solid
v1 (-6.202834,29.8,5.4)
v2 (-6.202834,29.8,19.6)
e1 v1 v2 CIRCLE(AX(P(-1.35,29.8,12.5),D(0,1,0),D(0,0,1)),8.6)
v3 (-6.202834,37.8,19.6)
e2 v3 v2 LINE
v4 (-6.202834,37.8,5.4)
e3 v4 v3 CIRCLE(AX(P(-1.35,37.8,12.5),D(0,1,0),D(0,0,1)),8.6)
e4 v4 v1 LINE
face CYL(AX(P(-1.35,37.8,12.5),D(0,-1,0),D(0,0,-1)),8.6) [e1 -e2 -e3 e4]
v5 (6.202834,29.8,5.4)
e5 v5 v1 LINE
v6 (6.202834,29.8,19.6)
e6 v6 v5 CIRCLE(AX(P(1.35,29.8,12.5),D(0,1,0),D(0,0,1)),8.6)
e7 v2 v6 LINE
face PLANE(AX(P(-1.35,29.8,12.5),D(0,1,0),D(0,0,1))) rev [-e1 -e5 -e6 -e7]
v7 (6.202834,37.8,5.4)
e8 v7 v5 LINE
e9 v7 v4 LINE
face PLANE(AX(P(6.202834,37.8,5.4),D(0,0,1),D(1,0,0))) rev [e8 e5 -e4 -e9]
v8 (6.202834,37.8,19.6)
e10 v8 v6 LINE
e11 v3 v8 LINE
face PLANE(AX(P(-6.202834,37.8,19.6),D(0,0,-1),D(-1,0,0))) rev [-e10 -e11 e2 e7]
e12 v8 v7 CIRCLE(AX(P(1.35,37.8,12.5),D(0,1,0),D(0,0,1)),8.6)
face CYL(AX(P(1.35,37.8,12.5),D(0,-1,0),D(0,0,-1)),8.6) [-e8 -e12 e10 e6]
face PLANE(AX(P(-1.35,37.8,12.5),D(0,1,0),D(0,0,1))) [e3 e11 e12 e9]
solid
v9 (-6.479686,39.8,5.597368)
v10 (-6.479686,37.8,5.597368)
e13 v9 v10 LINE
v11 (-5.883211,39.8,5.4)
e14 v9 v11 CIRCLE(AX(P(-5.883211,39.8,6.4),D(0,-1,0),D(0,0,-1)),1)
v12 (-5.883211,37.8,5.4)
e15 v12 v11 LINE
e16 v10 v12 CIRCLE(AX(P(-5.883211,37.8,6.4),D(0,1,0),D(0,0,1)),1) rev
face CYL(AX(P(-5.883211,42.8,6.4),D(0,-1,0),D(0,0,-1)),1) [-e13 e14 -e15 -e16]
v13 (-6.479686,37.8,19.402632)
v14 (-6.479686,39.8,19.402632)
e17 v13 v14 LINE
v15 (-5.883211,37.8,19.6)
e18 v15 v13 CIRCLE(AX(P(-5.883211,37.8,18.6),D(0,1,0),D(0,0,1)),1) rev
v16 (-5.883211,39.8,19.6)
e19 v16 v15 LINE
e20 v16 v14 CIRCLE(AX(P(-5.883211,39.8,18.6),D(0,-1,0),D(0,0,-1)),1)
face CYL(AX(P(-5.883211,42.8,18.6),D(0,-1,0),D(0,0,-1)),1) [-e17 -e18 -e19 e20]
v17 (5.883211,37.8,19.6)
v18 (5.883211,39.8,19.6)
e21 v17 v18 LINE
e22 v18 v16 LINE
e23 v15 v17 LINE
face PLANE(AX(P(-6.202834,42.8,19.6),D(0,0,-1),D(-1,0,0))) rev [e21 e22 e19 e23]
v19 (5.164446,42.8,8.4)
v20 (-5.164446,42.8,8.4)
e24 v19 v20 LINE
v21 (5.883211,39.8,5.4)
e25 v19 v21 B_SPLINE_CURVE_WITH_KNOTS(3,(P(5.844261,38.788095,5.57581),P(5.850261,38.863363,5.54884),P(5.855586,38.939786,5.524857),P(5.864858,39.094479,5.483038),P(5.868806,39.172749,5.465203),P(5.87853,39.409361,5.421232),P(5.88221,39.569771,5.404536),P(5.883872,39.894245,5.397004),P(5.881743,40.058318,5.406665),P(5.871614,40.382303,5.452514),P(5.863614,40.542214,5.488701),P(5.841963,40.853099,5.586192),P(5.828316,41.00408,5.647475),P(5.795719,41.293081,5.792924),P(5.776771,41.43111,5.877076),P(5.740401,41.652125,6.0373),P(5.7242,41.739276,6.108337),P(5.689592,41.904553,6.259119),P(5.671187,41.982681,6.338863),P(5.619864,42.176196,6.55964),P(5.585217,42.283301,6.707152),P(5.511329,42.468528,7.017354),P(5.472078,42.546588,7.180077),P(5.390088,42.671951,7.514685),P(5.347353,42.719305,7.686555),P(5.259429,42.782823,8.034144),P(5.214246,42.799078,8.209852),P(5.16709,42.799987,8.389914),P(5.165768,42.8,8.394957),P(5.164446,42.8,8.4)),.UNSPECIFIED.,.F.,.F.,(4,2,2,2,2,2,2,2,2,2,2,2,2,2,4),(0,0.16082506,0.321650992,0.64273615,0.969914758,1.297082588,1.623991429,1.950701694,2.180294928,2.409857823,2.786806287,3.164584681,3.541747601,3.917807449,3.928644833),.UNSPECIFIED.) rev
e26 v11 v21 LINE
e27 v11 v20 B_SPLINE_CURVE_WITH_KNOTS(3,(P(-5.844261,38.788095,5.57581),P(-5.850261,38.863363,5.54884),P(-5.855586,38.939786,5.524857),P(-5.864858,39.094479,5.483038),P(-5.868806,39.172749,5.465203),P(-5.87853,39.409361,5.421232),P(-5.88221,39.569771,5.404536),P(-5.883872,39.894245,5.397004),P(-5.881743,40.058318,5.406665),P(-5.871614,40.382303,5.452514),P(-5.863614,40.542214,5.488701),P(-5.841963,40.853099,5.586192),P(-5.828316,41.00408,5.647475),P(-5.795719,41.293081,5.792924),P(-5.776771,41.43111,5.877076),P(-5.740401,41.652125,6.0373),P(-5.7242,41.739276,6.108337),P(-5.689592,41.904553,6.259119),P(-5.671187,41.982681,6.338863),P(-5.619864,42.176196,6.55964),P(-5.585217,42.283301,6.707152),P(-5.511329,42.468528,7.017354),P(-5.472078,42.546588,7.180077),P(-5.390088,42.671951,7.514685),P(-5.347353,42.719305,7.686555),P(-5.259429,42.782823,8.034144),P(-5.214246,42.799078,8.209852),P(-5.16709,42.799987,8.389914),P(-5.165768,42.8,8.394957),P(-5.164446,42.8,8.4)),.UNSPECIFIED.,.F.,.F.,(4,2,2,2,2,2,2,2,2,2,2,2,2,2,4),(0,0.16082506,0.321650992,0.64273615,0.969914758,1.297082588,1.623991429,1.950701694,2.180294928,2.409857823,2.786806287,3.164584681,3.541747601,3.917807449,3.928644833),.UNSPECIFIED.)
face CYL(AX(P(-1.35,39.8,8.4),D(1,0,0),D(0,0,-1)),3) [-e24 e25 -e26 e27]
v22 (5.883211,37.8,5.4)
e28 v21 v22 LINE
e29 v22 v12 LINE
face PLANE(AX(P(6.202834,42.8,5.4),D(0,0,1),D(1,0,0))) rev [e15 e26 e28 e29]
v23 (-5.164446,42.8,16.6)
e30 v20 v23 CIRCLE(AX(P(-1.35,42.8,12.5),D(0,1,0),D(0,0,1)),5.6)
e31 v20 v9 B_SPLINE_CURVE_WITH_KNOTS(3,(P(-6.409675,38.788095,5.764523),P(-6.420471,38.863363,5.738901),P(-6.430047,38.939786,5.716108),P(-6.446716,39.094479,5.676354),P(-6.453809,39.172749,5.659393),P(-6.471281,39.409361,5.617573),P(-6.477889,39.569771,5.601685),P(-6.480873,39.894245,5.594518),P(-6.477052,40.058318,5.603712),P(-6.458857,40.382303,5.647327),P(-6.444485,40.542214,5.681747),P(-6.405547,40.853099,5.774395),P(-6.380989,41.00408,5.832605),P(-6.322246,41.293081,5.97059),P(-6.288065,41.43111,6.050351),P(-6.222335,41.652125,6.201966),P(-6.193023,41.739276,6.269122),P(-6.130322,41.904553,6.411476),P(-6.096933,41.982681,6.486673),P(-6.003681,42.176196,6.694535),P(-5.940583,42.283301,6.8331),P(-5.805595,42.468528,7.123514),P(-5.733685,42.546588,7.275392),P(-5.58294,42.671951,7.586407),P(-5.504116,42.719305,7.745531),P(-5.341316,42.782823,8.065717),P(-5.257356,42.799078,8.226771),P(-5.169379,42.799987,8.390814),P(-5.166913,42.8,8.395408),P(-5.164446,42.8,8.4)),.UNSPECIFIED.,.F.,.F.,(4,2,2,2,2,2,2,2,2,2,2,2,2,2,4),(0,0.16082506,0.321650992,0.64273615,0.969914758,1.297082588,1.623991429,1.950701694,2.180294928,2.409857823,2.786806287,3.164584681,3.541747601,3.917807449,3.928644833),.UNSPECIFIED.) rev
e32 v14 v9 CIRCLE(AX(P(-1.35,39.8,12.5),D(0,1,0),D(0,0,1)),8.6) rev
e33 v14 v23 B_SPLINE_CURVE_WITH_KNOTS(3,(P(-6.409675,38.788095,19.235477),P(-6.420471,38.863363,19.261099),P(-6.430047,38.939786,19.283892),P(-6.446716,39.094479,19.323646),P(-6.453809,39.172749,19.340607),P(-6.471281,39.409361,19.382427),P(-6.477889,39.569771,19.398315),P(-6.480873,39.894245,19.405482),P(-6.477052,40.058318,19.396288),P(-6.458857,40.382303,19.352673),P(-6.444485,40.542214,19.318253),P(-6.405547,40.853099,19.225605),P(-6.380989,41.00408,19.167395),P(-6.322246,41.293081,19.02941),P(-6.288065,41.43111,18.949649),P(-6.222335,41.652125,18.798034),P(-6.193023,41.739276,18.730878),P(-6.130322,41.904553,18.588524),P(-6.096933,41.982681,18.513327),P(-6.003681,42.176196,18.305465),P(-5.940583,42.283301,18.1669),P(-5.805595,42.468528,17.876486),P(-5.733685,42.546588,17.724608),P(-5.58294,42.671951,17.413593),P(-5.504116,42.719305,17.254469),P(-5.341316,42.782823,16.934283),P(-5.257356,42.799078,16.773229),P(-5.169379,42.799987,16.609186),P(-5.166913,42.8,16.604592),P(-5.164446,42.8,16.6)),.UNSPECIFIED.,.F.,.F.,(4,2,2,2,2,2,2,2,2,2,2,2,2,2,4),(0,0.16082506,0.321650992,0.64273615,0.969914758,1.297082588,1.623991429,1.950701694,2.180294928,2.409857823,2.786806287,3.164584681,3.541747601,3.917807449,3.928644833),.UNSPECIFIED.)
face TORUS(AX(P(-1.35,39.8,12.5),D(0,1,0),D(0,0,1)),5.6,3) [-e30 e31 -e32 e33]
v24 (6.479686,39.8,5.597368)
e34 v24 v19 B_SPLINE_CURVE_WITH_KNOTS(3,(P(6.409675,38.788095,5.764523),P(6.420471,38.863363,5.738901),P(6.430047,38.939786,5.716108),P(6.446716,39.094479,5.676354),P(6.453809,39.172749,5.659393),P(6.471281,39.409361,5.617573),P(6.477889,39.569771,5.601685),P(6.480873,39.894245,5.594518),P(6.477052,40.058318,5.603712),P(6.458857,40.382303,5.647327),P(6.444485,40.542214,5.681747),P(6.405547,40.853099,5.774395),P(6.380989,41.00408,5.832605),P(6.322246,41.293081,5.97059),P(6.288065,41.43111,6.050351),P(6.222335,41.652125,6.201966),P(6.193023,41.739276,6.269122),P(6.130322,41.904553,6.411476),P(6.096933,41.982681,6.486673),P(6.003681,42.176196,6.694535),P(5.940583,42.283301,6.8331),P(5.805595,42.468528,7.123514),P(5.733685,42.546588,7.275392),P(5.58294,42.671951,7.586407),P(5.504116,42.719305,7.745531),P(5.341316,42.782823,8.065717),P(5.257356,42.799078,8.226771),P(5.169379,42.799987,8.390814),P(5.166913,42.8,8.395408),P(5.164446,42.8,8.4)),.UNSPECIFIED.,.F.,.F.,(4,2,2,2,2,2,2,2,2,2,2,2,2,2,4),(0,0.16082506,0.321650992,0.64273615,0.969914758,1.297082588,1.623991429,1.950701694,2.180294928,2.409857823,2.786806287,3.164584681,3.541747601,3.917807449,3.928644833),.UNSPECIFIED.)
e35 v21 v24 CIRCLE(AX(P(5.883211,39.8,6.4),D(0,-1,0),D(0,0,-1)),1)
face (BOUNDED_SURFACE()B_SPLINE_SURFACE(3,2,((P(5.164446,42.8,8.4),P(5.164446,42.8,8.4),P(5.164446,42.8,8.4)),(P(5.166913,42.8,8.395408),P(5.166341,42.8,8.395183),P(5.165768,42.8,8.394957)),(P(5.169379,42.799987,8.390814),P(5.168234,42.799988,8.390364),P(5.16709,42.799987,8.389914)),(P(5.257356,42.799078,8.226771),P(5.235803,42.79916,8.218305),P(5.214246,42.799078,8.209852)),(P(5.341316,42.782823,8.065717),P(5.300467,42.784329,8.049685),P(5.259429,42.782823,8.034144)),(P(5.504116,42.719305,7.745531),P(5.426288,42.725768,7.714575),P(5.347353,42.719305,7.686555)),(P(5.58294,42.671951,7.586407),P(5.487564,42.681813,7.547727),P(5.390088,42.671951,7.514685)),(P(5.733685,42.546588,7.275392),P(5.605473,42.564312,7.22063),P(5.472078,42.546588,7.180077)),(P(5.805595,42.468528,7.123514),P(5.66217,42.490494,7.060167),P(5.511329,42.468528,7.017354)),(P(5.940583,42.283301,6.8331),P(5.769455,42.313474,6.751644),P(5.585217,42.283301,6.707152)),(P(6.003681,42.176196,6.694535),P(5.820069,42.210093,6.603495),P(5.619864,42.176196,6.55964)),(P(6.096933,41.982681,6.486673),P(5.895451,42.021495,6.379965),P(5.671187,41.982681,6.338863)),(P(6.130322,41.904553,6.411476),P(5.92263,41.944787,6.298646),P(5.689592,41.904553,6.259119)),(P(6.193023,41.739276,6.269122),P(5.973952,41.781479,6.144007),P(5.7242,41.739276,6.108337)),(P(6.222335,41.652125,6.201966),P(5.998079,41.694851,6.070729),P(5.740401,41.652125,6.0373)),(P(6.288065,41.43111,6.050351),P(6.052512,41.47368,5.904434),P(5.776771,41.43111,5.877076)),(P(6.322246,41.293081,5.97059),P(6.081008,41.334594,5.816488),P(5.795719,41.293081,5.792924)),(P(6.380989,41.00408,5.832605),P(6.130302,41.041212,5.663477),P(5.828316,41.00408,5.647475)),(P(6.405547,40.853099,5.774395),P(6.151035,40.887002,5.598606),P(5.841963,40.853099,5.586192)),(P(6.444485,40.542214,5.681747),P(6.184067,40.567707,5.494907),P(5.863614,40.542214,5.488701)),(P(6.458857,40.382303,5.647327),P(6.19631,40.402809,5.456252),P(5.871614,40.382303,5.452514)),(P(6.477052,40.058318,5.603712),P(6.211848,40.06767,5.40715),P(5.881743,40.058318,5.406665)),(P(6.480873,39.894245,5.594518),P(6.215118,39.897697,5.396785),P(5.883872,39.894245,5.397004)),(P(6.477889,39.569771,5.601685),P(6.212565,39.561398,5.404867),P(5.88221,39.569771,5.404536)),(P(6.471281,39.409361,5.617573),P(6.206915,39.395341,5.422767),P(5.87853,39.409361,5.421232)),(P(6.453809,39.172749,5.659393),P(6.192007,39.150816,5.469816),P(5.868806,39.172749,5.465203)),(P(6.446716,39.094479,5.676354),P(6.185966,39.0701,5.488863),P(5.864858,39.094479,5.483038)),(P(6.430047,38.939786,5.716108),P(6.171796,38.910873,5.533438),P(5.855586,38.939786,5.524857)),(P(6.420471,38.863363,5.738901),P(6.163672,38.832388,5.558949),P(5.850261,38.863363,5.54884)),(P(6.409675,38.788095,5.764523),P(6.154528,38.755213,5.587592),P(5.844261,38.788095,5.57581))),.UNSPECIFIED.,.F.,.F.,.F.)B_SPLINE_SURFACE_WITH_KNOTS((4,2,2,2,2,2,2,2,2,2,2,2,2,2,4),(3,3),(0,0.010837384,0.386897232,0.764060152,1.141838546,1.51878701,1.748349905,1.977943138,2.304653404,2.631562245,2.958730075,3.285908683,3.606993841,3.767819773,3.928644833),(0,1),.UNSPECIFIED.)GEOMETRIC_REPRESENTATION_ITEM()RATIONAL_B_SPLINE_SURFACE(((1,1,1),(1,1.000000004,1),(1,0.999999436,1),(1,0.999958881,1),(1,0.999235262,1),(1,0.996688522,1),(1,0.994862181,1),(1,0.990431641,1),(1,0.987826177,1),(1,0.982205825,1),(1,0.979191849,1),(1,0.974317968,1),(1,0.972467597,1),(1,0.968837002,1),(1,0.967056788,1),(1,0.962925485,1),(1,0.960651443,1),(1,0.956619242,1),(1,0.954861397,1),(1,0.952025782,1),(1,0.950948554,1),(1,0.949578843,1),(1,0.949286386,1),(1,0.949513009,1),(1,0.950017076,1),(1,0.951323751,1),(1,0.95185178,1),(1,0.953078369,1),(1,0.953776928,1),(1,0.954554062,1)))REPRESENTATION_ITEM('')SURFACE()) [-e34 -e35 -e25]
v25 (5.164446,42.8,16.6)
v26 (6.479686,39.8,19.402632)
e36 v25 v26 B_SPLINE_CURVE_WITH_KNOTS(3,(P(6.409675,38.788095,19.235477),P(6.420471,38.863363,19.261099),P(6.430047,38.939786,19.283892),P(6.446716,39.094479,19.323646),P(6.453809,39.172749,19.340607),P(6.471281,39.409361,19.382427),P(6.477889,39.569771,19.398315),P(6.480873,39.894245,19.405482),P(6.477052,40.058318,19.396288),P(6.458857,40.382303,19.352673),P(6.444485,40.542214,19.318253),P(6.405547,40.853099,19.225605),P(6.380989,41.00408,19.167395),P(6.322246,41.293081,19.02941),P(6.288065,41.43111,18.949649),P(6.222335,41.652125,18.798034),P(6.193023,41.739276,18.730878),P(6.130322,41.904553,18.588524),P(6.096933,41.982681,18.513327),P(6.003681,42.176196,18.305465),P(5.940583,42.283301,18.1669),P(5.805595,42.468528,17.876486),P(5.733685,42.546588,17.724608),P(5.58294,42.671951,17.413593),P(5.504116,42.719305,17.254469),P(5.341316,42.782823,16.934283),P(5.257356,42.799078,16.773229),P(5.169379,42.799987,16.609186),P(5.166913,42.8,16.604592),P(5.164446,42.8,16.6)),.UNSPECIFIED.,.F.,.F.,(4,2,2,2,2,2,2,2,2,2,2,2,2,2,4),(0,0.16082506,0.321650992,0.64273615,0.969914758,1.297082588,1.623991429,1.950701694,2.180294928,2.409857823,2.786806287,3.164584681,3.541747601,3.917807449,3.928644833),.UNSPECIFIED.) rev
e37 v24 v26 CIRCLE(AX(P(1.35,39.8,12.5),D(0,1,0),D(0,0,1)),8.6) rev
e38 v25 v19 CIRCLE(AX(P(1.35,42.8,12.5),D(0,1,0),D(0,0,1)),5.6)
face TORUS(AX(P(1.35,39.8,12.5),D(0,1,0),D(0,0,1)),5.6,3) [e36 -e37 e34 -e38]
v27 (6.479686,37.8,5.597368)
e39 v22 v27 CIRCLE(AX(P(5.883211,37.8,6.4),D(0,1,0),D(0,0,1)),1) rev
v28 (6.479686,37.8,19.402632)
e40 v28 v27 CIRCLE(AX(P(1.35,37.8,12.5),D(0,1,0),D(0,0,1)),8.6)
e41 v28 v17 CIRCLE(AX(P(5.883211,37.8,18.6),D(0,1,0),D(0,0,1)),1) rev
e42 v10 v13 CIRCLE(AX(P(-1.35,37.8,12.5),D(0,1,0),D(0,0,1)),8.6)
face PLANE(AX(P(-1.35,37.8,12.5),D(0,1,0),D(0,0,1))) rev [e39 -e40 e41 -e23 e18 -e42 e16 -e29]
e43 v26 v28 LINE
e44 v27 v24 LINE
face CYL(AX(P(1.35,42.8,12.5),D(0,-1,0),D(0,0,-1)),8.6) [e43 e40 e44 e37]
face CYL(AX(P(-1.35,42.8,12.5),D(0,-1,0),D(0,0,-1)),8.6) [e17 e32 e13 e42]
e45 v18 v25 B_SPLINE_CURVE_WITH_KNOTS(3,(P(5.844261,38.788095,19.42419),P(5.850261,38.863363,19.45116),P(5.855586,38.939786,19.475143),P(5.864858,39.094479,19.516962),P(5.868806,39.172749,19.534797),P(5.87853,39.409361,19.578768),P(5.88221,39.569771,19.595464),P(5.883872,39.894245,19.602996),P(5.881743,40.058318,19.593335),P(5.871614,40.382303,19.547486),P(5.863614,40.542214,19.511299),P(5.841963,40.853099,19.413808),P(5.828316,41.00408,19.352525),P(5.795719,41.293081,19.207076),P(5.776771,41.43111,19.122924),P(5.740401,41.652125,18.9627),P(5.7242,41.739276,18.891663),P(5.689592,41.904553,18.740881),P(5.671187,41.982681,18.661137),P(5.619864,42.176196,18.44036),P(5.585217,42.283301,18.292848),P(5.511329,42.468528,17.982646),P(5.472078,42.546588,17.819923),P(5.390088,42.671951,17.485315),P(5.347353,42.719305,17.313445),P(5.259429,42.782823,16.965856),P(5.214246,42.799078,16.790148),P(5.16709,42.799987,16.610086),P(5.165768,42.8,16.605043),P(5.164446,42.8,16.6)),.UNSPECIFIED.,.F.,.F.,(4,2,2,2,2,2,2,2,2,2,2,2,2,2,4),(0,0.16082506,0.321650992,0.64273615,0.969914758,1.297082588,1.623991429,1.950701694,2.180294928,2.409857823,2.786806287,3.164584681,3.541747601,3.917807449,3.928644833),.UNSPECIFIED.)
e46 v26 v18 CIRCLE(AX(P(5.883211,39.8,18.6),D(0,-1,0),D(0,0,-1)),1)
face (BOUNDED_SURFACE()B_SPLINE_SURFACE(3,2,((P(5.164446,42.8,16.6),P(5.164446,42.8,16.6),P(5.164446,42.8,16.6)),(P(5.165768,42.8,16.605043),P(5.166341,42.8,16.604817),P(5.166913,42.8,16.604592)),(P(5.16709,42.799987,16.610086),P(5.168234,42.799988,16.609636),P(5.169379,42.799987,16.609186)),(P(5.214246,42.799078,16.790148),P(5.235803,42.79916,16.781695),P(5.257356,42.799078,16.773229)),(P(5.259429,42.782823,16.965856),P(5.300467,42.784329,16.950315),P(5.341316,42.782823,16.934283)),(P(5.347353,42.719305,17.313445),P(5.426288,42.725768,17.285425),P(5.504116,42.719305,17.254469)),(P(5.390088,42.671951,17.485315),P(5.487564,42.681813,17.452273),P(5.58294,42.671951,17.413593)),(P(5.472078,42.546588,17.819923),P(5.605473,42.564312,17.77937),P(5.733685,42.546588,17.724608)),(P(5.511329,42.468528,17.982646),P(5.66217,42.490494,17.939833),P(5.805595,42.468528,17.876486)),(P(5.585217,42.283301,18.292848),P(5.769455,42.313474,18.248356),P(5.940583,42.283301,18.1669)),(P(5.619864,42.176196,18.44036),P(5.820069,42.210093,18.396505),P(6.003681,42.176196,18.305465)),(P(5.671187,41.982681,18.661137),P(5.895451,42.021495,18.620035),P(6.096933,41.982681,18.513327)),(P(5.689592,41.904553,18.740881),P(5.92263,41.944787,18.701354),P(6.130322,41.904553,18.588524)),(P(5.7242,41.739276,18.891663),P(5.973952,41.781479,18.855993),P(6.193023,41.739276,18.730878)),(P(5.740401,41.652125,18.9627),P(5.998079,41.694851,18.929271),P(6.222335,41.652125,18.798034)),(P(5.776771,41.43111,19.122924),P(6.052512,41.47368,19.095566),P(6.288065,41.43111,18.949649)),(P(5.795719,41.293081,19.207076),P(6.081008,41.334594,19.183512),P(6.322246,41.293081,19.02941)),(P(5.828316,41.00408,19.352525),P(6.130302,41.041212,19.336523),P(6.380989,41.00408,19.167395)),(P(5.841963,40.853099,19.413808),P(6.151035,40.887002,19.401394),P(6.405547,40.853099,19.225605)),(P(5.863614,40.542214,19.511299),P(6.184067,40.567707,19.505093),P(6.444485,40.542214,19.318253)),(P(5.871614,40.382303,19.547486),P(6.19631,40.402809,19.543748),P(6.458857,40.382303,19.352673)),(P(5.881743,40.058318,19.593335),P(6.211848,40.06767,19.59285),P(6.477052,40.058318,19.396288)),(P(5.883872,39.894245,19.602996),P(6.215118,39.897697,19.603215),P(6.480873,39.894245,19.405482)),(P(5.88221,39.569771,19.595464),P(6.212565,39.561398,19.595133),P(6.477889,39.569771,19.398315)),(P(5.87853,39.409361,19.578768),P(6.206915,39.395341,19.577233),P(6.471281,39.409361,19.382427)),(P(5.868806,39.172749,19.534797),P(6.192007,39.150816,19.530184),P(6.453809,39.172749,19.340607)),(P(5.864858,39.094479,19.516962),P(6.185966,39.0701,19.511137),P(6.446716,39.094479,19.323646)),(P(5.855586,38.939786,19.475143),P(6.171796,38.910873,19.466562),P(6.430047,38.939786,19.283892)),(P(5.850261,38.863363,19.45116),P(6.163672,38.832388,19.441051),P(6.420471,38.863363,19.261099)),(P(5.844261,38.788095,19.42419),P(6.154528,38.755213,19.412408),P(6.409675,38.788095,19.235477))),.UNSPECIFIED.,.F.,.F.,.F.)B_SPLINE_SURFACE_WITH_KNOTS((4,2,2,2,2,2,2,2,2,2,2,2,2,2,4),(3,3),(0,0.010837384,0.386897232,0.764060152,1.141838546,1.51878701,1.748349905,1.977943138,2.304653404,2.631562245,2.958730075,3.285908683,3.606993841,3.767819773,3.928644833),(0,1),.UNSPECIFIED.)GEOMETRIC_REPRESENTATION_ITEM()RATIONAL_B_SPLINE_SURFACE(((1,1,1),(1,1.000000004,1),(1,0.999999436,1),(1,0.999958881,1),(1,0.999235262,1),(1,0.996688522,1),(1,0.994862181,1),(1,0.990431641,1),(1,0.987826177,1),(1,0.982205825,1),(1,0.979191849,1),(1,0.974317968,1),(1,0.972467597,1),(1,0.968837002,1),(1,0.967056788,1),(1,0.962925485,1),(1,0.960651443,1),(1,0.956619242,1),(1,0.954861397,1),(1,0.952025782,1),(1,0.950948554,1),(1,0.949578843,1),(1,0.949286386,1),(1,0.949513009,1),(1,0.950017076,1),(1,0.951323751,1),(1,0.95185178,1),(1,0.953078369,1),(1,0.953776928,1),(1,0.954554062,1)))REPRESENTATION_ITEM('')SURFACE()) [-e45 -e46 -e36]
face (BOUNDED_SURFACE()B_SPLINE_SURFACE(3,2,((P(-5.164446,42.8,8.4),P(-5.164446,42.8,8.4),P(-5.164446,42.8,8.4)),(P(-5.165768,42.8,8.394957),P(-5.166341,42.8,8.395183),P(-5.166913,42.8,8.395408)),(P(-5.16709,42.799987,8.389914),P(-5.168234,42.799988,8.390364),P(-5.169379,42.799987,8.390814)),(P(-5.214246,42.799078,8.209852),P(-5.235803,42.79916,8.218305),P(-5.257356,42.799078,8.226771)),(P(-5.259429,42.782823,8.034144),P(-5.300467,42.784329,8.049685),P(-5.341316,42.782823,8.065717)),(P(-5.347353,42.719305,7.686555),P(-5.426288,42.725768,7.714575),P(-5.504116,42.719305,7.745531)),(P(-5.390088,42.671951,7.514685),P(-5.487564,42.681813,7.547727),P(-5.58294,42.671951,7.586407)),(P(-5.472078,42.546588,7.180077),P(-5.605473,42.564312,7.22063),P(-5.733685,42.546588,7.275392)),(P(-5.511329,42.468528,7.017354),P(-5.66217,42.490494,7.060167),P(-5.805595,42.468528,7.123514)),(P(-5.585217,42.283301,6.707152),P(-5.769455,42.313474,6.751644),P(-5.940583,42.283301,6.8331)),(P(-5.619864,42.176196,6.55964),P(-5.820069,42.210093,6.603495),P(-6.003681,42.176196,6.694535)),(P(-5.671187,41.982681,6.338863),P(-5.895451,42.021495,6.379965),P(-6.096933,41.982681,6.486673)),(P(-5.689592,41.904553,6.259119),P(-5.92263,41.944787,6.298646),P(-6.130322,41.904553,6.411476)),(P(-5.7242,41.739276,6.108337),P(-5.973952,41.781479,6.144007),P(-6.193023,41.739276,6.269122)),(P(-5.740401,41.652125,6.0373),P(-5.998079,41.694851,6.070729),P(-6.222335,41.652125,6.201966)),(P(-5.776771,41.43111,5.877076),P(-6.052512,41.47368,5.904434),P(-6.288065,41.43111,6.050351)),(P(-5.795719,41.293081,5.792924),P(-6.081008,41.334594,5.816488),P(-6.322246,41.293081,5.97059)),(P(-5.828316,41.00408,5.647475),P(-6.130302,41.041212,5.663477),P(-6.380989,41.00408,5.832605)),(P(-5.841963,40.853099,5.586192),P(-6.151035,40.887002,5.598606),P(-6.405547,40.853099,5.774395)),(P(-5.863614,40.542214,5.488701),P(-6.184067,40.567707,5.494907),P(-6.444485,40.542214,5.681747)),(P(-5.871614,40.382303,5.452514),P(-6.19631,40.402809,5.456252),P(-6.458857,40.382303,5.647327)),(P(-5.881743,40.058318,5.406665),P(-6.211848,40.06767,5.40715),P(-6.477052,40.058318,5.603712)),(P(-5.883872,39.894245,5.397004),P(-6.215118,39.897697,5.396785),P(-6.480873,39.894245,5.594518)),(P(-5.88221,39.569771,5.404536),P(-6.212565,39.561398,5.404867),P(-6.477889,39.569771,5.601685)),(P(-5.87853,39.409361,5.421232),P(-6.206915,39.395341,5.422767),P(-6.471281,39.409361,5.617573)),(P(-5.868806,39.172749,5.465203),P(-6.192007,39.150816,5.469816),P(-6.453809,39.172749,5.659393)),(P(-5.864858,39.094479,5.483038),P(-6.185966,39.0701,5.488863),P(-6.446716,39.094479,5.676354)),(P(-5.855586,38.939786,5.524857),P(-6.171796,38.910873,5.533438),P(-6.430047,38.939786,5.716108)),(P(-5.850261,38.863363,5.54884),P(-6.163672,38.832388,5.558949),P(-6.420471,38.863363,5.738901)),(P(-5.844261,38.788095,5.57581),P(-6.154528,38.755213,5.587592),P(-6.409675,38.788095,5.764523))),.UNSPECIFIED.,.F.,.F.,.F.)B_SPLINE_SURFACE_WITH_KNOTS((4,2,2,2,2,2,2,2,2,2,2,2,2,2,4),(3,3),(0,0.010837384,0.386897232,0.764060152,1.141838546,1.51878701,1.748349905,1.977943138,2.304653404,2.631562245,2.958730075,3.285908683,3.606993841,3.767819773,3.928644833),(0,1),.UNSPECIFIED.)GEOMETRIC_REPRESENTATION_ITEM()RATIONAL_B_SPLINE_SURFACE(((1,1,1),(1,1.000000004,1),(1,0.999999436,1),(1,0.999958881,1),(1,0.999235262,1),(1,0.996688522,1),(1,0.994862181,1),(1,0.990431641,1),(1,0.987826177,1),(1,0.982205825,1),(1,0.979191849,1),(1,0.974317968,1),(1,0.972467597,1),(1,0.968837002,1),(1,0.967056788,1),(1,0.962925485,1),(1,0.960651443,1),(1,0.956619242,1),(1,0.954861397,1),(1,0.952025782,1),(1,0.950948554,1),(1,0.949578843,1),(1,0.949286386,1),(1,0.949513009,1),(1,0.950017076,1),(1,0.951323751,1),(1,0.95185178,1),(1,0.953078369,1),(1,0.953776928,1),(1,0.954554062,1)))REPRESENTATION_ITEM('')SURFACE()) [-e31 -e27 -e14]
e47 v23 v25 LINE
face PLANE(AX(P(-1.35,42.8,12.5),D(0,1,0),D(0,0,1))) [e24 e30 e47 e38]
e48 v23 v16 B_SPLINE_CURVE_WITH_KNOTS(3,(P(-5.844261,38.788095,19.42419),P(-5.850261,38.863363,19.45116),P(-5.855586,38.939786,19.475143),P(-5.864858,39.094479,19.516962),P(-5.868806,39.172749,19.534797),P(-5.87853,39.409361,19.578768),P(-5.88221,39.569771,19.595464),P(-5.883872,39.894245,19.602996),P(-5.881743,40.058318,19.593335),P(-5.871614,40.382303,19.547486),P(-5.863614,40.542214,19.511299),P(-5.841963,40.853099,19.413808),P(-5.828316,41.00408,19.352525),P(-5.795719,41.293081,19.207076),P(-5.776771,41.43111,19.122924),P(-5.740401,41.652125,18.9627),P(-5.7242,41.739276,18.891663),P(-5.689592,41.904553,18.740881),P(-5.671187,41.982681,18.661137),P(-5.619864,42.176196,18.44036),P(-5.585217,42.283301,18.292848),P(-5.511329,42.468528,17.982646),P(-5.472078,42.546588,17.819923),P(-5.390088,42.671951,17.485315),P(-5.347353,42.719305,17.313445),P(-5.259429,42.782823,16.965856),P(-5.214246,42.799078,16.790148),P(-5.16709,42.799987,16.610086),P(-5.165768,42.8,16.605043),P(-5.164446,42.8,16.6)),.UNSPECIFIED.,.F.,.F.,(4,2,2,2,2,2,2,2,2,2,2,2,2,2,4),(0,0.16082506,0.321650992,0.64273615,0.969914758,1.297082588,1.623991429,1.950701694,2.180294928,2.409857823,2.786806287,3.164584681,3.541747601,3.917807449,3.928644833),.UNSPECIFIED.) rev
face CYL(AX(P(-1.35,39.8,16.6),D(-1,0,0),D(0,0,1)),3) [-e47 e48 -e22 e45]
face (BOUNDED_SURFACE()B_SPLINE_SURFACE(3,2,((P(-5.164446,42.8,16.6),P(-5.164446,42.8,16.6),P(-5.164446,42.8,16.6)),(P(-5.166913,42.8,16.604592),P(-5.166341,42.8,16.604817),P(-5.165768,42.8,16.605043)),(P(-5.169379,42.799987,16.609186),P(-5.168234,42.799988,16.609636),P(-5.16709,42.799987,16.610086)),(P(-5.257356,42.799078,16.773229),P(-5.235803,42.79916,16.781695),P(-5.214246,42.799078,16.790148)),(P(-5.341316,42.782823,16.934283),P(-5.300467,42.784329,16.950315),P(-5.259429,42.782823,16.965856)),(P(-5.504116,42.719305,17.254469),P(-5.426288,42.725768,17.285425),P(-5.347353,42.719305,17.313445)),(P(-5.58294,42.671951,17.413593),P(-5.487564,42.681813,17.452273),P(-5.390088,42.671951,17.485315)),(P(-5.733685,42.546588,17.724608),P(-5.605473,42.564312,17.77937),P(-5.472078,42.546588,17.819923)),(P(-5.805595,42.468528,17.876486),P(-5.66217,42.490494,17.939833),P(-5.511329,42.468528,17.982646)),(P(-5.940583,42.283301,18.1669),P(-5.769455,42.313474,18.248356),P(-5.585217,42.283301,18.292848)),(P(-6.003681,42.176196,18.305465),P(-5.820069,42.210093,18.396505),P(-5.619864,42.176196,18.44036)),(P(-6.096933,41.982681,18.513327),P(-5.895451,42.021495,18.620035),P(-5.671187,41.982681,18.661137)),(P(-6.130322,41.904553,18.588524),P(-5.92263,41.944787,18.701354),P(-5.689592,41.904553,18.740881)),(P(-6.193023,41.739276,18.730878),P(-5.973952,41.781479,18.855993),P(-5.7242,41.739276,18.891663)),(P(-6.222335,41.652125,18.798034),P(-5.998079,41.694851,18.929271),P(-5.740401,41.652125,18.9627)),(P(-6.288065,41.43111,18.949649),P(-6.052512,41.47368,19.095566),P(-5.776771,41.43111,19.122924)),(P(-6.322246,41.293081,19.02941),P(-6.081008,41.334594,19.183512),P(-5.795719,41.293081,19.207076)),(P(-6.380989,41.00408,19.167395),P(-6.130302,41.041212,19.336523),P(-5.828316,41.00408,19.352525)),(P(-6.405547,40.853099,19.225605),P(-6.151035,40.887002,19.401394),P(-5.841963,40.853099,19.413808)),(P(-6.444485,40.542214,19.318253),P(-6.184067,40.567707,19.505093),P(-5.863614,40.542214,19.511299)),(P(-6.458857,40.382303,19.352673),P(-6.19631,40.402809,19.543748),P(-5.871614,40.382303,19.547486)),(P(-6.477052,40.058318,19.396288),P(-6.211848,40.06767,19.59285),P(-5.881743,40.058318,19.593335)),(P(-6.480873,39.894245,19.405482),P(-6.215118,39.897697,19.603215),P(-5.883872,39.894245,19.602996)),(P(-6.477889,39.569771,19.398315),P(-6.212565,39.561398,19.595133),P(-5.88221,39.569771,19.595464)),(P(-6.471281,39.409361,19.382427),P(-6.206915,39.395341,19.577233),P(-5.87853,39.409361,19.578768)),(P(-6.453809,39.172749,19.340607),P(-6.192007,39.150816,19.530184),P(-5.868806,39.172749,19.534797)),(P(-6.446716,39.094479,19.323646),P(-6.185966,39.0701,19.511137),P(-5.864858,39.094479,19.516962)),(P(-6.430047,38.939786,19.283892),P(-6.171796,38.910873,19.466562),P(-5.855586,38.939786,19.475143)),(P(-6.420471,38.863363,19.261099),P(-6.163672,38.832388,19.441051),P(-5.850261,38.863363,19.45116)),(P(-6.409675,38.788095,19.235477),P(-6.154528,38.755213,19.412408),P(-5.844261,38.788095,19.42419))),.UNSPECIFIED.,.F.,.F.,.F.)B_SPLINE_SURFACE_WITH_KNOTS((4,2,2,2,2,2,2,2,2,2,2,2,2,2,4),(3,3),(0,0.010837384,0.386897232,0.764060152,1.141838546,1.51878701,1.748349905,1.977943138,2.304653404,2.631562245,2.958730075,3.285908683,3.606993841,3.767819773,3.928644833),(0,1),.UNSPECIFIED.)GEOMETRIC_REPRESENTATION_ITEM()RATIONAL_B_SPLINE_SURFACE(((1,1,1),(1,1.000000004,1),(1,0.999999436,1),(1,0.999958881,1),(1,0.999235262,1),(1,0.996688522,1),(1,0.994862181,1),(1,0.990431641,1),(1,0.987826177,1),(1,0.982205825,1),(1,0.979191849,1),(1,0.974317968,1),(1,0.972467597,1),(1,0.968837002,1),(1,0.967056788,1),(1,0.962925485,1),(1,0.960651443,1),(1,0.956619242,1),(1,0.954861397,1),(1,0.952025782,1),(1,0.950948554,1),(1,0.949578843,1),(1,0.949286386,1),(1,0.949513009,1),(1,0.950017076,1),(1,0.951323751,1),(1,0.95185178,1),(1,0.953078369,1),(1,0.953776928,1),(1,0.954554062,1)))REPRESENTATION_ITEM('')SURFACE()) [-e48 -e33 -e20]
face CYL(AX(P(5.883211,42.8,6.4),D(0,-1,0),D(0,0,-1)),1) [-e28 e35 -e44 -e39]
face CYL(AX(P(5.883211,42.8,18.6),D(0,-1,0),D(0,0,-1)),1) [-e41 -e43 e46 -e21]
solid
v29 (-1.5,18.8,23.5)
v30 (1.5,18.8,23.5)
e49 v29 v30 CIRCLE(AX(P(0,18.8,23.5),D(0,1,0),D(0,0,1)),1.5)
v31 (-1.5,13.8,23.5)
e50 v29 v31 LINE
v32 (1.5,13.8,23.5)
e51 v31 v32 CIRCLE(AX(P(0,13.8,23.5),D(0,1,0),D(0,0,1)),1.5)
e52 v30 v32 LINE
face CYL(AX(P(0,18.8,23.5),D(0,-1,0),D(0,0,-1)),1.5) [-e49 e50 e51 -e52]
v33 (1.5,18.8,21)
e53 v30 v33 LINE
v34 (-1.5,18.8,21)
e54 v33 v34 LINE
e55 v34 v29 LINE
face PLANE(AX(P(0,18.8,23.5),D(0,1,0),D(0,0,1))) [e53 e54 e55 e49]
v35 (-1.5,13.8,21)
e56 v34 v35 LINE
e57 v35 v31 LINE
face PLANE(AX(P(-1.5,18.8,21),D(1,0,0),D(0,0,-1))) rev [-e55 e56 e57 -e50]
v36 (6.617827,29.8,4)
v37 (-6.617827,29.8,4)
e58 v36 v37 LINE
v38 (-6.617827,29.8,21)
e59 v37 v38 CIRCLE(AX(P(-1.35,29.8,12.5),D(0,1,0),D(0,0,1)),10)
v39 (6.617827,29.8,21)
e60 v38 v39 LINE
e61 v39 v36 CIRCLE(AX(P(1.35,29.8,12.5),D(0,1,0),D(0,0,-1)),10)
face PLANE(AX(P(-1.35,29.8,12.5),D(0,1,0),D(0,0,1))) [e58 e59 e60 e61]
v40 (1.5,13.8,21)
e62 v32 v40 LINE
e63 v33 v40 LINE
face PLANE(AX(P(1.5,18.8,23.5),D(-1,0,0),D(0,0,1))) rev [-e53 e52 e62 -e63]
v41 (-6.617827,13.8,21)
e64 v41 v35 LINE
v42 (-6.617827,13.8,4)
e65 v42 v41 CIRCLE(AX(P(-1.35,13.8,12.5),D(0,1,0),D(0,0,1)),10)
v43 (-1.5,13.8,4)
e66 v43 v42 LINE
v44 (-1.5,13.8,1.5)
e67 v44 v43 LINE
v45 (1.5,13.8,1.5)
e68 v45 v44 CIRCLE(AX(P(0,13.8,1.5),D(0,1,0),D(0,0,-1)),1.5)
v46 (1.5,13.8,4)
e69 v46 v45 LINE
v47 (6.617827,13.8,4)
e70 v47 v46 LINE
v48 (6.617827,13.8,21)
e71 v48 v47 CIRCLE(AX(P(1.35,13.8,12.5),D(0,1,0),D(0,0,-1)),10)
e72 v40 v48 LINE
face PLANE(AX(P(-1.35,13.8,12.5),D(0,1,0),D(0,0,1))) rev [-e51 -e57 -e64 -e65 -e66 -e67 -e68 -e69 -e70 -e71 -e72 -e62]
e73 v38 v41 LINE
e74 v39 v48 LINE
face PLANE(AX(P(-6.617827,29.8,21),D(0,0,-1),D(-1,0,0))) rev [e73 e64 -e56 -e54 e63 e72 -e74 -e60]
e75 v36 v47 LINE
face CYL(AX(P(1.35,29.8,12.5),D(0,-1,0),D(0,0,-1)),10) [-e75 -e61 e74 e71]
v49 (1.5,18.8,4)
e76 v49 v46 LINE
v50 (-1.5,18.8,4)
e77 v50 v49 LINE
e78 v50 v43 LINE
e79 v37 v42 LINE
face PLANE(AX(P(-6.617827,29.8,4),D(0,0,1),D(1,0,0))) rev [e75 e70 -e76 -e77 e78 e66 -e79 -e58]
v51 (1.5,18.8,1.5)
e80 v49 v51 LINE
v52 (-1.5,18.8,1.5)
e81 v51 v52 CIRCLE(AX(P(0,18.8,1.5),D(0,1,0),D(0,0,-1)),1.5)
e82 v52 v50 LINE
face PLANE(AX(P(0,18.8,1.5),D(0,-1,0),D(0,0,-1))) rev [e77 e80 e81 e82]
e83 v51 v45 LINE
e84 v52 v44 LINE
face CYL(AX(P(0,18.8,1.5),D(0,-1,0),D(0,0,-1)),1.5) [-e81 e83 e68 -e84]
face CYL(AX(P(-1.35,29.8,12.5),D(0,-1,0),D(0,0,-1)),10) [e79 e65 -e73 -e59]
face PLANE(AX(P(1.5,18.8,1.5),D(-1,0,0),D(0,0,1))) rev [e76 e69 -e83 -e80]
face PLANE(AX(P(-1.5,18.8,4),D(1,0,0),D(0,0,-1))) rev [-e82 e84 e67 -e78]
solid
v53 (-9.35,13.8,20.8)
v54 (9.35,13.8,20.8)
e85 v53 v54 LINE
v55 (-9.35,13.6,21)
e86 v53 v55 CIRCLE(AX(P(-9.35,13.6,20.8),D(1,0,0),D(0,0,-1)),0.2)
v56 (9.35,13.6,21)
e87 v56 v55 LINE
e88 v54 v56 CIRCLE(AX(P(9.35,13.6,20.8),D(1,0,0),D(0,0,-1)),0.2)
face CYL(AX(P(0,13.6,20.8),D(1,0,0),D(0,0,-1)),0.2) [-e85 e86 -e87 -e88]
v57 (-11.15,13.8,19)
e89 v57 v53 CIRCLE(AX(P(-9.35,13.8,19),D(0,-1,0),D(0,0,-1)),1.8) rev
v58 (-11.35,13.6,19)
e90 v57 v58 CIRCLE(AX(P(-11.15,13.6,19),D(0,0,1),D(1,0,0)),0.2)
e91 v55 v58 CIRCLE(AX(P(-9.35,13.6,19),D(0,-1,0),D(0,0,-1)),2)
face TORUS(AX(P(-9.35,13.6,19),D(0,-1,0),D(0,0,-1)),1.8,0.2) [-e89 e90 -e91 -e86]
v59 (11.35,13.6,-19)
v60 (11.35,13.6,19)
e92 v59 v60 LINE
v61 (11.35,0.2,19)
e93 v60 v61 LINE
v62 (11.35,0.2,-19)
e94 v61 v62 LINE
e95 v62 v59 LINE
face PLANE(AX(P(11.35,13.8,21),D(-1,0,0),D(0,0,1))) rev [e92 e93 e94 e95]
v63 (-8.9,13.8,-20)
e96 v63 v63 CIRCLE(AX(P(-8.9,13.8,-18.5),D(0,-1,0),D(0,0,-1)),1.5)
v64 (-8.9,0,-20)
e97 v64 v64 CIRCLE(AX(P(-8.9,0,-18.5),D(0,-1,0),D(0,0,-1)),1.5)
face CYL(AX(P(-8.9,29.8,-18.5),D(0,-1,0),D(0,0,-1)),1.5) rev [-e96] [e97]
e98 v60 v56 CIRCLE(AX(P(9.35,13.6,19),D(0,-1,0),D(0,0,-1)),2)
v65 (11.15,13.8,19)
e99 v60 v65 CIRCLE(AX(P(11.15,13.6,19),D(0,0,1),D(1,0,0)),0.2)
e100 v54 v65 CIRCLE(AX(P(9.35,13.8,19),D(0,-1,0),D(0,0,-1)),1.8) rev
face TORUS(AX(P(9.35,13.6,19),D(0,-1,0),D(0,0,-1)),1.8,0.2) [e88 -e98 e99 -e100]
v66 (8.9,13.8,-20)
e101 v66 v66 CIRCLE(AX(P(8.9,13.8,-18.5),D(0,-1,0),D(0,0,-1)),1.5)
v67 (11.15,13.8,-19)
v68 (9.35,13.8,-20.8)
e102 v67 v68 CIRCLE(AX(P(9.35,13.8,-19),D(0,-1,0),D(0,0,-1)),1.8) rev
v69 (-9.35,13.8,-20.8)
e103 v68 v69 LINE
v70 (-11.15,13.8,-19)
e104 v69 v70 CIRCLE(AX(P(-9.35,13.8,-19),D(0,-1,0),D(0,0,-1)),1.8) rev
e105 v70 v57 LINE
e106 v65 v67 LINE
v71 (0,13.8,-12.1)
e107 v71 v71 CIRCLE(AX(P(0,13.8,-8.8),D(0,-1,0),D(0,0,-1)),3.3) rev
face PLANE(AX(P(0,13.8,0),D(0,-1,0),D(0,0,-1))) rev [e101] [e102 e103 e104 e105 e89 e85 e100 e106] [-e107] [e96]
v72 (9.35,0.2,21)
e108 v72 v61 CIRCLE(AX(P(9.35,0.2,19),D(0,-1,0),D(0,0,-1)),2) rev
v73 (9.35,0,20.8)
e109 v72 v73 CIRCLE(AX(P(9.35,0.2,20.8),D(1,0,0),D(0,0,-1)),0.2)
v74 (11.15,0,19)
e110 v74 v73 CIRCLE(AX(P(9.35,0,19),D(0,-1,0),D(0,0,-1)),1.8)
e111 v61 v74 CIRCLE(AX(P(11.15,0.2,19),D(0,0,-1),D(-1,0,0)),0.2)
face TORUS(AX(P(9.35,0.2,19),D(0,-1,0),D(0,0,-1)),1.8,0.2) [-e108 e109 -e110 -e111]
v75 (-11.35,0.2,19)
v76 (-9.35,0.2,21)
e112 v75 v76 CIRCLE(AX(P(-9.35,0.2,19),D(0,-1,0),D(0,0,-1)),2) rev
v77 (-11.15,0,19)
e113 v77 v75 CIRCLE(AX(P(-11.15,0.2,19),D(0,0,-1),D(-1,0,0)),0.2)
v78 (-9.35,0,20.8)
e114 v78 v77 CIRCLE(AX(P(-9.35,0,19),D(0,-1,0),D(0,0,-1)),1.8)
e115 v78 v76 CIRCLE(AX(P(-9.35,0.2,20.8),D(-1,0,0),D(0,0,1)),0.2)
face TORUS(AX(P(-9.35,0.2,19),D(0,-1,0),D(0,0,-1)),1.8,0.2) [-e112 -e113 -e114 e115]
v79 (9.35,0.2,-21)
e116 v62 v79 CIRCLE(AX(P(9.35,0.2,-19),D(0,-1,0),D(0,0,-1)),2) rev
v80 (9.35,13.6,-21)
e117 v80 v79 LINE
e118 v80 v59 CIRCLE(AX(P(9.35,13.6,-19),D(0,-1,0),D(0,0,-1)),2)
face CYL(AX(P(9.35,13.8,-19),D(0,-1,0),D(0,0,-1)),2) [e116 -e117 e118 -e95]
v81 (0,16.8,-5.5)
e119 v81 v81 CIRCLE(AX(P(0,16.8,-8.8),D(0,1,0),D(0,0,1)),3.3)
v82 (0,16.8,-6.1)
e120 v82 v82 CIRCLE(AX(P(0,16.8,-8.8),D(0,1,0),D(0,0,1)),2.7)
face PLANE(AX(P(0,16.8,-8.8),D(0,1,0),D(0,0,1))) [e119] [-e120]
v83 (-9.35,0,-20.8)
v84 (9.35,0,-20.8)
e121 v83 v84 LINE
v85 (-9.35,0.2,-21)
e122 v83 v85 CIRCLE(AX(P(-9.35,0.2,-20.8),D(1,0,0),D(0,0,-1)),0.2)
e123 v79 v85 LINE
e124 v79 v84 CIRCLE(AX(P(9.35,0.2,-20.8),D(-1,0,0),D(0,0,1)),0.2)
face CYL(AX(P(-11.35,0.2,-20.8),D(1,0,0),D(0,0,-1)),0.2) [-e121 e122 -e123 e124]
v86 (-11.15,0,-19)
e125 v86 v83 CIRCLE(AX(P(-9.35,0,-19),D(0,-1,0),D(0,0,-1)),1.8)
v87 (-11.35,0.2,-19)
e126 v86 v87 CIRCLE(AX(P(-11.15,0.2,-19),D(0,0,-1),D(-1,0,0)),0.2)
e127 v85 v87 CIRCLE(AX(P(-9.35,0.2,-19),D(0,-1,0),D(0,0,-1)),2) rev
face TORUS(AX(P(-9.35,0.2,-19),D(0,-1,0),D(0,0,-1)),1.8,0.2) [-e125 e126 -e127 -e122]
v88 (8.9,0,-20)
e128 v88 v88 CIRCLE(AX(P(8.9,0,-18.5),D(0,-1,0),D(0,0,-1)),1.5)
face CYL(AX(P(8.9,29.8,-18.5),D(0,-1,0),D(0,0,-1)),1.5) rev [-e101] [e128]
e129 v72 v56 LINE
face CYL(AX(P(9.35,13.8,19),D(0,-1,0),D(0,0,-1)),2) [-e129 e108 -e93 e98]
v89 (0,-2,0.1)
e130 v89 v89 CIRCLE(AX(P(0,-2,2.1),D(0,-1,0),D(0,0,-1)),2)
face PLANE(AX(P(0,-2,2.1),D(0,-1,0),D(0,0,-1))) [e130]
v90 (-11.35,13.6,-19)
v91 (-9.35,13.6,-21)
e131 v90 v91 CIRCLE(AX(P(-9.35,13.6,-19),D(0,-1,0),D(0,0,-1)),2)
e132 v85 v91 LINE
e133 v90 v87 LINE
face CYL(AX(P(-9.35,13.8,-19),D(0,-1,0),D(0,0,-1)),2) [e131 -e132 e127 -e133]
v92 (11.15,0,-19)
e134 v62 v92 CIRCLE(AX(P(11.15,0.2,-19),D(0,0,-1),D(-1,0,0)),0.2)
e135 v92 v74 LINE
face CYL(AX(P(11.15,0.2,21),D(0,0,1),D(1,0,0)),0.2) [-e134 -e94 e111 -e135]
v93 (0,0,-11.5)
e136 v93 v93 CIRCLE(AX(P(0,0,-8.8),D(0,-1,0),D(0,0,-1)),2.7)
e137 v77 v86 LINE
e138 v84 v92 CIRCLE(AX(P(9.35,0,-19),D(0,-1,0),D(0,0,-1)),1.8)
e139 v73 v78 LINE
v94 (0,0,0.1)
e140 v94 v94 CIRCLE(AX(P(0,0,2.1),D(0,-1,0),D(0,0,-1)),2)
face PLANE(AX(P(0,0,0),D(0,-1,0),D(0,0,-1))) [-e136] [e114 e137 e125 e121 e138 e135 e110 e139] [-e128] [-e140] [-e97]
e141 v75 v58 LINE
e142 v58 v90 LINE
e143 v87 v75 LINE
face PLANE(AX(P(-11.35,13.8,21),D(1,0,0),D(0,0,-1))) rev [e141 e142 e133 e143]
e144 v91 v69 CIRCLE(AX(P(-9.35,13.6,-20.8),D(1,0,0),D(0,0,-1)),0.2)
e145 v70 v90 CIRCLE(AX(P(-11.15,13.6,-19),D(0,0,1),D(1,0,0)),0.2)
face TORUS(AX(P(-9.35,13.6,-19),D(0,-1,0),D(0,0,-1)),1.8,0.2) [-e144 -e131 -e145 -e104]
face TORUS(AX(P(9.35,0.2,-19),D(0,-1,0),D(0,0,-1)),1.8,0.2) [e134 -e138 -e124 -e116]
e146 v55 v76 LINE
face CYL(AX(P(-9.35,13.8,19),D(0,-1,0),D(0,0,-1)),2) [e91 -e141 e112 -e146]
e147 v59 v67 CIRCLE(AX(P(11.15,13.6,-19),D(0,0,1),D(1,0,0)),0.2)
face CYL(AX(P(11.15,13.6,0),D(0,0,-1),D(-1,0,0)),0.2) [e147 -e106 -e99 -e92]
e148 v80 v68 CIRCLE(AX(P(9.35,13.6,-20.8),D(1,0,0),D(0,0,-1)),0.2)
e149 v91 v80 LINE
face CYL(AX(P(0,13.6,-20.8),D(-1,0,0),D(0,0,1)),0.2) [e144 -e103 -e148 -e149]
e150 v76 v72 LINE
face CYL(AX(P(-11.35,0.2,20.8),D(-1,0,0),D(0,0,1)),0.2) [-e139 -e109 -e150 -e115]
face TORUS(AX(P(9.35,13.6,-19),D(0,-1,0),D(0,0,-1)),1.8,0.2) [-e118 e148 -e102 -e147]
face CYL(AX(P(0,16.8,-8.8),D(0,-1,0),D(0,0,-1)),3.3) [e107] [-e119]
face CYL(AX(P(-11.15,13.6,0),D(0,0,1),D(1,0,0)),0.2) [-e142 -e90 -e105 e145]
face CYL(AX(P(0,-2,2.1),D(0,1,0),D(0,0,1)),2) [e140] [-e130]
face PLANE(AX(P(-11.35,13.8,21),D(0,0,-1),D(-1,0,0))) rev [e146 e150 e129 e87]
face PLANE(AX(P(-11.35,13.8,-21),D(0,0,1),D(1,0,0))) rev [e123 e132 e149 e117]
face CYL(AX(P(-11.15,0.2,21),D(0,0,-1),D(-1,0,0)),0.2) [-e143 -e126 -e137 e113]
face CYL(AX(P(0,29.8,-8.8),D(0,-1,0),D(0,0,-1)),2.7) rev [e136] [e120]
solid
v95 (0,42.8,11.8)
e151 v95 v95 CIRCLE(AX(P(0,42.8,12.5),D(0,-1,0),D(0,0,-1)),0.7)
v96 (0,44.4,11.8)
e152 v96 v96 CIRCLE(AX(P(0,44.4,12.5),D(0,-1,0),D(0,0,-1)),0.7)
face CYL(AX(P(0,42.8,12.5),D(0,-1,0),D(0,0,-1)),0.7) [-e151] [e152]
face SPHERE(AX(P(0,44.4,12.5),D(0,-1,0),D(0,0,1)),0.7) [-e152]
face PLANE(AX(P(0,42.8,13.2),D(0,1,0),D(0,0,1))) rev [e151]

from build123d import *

# Parameters (mm, degrees)
SKETCH1_W           = 22.7
SKETCH1_H           = 42
BOSS_EXTRUDE1_DEPTH = 13.8
BOSS_EXTRUDE2_DEPTH = 16
SKETCH3_R           = 2.7
CUT_EXTRUDE1_DEPTH  = 39.181965638
FILLET1_R           = 2
FILLET2_R           = 0.2
SKETCH4_R           = 1.5
CUT_EXTRUDE2_DEPTH  = 39.181965638
SKETCH5_R           = 3.3
SKETCH5_R_2         = 2.7
BOSS_EXTRUDE3_DEPTH = 3
BOSS_EXTRUDE4_DEPTH = 5
BOSS_EXTRUDE5_DEPTH = 8
BOSS_EXTRUDE6_DEPTH = 5
FILLET3_R           = 3
FILLET4_R           = 1
SKETCH10_R          = 2
BOSS_EXTRUDE7_DEPTH = 2


with BuildPart() as part:
    # Sketch1 → Boss-Extrude1 (new body)
    with BuildSketch(Plane(origin=(0, 0, 0), x_dir=(1, 0, 0), z_dir=(0, 1, 0))):
        Rectangle(SKETCH1_W, SKETCH1_H)
    extrude(amount=BOSS_EXTRUDE1_DEPTH)

    # Sketch3 → Cut-Extrude1 (cut, through all)
    with BuildSketch(Plane.XZ):
        with Locations(Location((0, -8.8, 0), (0, 0, 270))):
            Circle(SKETCH3_R)
    extrude(amount=-CUT_EXTRUDE1_DEPTH, mode=Mode.SUBTRACT)

    # Fillet1
    fillet1_edges = [part.edges().sort_by_distance(p)[0] for p in [
        (11.35, 6.9, 21),
        (-11.35, 6.9, 21),
        (-11.35, 6.9, -21),
        (11.35, 6.9, -21),
    ]]
    fillet(fillet1_edges, radius=FILLET1_R)

    # Fillet2
    fillet2_edges = [part.edges().sort_by_distance(p)[0] for p in [
        (-11.35, 0, 0),
        (-11.35, 13.8, 0),
        (11.35, 0, 0),
        (0, 0, 21),
        (0, 0, -21),
        (10.764213562, 0, -20.414213562),
        (10.764213562, 0, 20.414213562),
        (-10.764213562, 0, 20.414213562),
        (-10.764213562, 0, -20.414213562),
        (0, 13.8, -21),
        (11.35, 13.8, 0),
        (0, 13.8, 21),
        (10.764213562, 13.8, -20.414213562),
        (10.764213562, 13.8, 20.414213562),
        (-10.764213562, 13.8, 20.414213562),
        (-10.764213562, 13.8, -20.414213562),
    ]]
    fillet(fillet2_edges, radius=FILLET2_R)

    # Sketch4 → Cut-Extrude2 (cut, through all)
    with BuildSketch(Plane.XZ):
        with Locations(Location((-8.9, -18.5, 0), (0, 0, 270))):
            Circle(SKETCH4_R)
        with Locations(Location((8.9, -18.5, 0), (0, 0, 270))):
            Circle(SKETCH4_R)
    extrude(amount=-CUT_EXTRUDE2_DEPTH, mode=Mode.SUBTRACT)

    # Sketch5 → Boss-Extrude3 (add)
    with BuildSketch(Plane(origin=(0, 13.8, 0), x_dir=(1, 0, 0), z_dir=(0, 1, 0))):
        with Locations(Location((0, 8.8, 0), (0, 0, 90))):
            Circle(SKETCH5_R)
        with Locations(Location((0, 8.8, 0), (0, 0, 90))):
            Circle(SKETCH5_R_2, mode=Mode.SUBTRACT)
    extrude(amount=BOSS_EXTRUDE3_DEPTH)

    # Sketch10 → Boss-Extrude7 (add)
    with BuildSketch(Plane.XZ):
        with Locations(Location((0, 2.1, 0), (0, 0, 270))):
            Circle(SKETCH10_R)
    extrude(amount=BOSS_EXTRUDE7_DEPTH)


with BuildPart() as body_2:
    # Sketch2 → Boss-Extrude2 (new body)
    with BuildSketch(Plane(origin=(0, 13.8, 0), x_dir=(1, 0, 0), z_dir=(0, 1, 0))):
        with BuildLine():
            Line((-6.617826876, -21), (6.617826876, -21))
            ThreePointArc((6.617826876, -21), (11.35, -12.5), (6.617826876, -4))
            Line((6.617826876, -4), (-6.617826876, -4))
            ThreePointArc((-6.617826876, -4), (-11.35, -12.5), (-6.617826876, -21))
        make_face()
    extrude(amount=BOSS_EXTRUDE2_DEPTH)

    # Sketch6 → Boss-Extrude4 (add)
    with BuildSketch(Plane(origin=(0, 13.8, 0), x_dir=(1, 0, 0), z_dir=(0, 1, 0))):
        with BuildLine():
            Line((-1.5, -21), (-1.5, -23.5))
            ThreePointArc((-1.5, -23.5), (0, -25), (1.5, -23.5))
            Line((1.5, -23.5), (1.5, -21))
            Line((1.5, -21), (-1.5, -21))
        make_face()
        with BuildLine():
            Line((1.5, -4), (-1.5, -4))
            Line((-1.5, -4), (-1.5, -1.5))
            ThreePointArc((-1.5, -1.5), (0, 0), (1.5, -1.5))
            Line((1.5, -1.5), (1.5, -4))
        make_face()
    extrude(amount=BOSS_EXTRUDE4_DEPTH)


with BuildPart() as body_3:
    # Sketch7 → Boss-Extrude5 (new body)
    with BuildSketch(Plane(origin=(0, 29.8, 0), x_dir=(1, 0, 0), z_dir=(0, 1, 0))):
        with BuildLine():
            Line((-6.202834223, -19.6), (6.202834223, -19.6))
            ThreePointArc((6.202834223, -19.6), (9.95, -12.5), (6.202834223, -5.4))
            Line((6.202834223, -5.4), (-6.202834223, -5.4))
            ThreePointArc((-6.202834223, -5.4), (-9.95, -12.5), (-6.202834223, -19.6))
        make_face()
    extrude(amount=BOSS_EXTRUDE5_DEPTH)


with BuildPart() as body_4:
    # Sketch8 → Boss-Extrude6 (new body)
    with BuildSketch(Plane(origin=(0, 37.8, 0), x_dir=(1, 0, 0), z_dir=(0, 1, 0))):
        with BuildLine():
            Line((-6.202834223, -19.6), (6.202834223, -19.6))
            ThreePointArc((6.202834223, -19.6), (9.95, -12.5), (6.202834223, -5.4))
            Line((6.202834223, -5.4), (-6.202834223, -5.4))
            ThreePointArc((-6.202834223, -5.4), (-9.95, -12.5), (-6.202834223, -19.6))
        make_face()
    extrude(amount=BOSS_EXTRUDE6_DEPTH)

    # Fillet3
    # the kernel refuses this fillet: 3 mm, written as the material it takes off along each edge
    with BuildSketch(Plane(origin=(1.35, 42.8, 12.5), x_dir=(-0.26968341341725877, 0, 0.9629490415009592), z_dir=(-0.9629490415009592, 0, -0.26968341341725877))) as fillet3_piece_1:
        with BuildLine():
            CenterArc((8.6 - FILLET3_R, -FILLET3_R), FILLET3_R, 0, 90)
            Line((8.6 - FILLET3_R, 0), (8.6, 0))
            Line((8.6, 0), (8.6, -FILLET3_R))
        make_face()
    revolve(axis=Axis((1.35, 42.8, 12.5), (0, 1, 0)), revolution_arc=211.290857959, mode=Mode.SUBTRACT)
    with BuildSketch(Plane(origin=(13.702834223, 42.8, 5.4), x_dir=(0, -1, 0), z_dir=(-1, 0, 0)), Plane(origin=(-13.702834223, 42.8, 19.6), x_dir=(0, -1, 0), z_dir=(1, 0, 0))) as fillet3_piece_2:
        with BuildLine():
            CenterArc((FILLET3_R, FILLET3_R), FILLET3_R, 180, 90)
            Line((0, FILLET3_R), (0, 0))
            Line((0, 0), (FILLET3_R, 0))
        make_face()
    extrude(amount=27.405668447, mode=Mode.SUBTRACT)
    with BuildSketch(Plane(origin=(-1.35, 42.8, 12.5), x_dir=(0.2696834134172578, 0, -0.9629490415009594), z_dir=(0.9629490415009594, 0, 0.2696834134172578))) as fillet3_piece_3:
        with BuildLine():
            CenterArc((8.6 - FILLET3_R, -FILLET3_R), FILLET3_R, 0, 90)
            Line((8.6 - FILLET3_R, 0), (8.6, 0))
            Line((8.6, 0), (8.6, -FILLET3_R))
        make_face()
    revolve(axis=Axis((-1.35, 42.8, 12.5), (0, 1, 0)), revolution_arc=211.290857959, mode=Mode.SUBTRACT)

    # Fillet4
    fillet4_edges = [body_4.edges().sort_by_distance(p)[0] for p in [
        (-6.202834223, 38.8, 5.4),
        (6.202834223, 38.8, 5.4),
        (6.202834223, 38.8, 19.6),
        (-6.202834223, 38.8, 19.6),
        (5.911819759, 41.955352557, 18.68673317),
        (-5.911819759, 41.955352557, 18.68673317),
        (5.911819759, 41.955352557, 6.31326683),
        (-5.911819759, 41.955352557, 6.31326683),
    ]]
    fillet(fillet4_edges, radius=FILLET4_R)


with BuildPart() as body_5:
    # Sketch9 → Revolve2 (revolve)
    with BuildSketch(Plane(origin=(0, 0, 0), x_dir=(0, 0, -1), z_dir=(1, 0, 0)), mode=Mode.PRIVATE) as revolve2_sk:
        with BuildLine():
            Line((-13.2, 42.8), (-13.2, 44.4))
            ThreePointArc((-13.2, 44.4), (-12.994974747, 44.894974747), (-12.5, 45.1))
            Line((-12.5, 45.1), (-12.5, 42.8))
            Line((-12.5, 42.8), (-13.2, 42.8))
        make_face()
    revolve(revolve2_sk.sketch.rotate(Axis((0, 42.8, 12.5), (0, 1, 0)), 180), axis=Axis((0, 42.8, 12.5), (0, 1, 0)))


solid = Compound([part.part, body_2.part, body_3.part, body_4.part, body_5.part])
